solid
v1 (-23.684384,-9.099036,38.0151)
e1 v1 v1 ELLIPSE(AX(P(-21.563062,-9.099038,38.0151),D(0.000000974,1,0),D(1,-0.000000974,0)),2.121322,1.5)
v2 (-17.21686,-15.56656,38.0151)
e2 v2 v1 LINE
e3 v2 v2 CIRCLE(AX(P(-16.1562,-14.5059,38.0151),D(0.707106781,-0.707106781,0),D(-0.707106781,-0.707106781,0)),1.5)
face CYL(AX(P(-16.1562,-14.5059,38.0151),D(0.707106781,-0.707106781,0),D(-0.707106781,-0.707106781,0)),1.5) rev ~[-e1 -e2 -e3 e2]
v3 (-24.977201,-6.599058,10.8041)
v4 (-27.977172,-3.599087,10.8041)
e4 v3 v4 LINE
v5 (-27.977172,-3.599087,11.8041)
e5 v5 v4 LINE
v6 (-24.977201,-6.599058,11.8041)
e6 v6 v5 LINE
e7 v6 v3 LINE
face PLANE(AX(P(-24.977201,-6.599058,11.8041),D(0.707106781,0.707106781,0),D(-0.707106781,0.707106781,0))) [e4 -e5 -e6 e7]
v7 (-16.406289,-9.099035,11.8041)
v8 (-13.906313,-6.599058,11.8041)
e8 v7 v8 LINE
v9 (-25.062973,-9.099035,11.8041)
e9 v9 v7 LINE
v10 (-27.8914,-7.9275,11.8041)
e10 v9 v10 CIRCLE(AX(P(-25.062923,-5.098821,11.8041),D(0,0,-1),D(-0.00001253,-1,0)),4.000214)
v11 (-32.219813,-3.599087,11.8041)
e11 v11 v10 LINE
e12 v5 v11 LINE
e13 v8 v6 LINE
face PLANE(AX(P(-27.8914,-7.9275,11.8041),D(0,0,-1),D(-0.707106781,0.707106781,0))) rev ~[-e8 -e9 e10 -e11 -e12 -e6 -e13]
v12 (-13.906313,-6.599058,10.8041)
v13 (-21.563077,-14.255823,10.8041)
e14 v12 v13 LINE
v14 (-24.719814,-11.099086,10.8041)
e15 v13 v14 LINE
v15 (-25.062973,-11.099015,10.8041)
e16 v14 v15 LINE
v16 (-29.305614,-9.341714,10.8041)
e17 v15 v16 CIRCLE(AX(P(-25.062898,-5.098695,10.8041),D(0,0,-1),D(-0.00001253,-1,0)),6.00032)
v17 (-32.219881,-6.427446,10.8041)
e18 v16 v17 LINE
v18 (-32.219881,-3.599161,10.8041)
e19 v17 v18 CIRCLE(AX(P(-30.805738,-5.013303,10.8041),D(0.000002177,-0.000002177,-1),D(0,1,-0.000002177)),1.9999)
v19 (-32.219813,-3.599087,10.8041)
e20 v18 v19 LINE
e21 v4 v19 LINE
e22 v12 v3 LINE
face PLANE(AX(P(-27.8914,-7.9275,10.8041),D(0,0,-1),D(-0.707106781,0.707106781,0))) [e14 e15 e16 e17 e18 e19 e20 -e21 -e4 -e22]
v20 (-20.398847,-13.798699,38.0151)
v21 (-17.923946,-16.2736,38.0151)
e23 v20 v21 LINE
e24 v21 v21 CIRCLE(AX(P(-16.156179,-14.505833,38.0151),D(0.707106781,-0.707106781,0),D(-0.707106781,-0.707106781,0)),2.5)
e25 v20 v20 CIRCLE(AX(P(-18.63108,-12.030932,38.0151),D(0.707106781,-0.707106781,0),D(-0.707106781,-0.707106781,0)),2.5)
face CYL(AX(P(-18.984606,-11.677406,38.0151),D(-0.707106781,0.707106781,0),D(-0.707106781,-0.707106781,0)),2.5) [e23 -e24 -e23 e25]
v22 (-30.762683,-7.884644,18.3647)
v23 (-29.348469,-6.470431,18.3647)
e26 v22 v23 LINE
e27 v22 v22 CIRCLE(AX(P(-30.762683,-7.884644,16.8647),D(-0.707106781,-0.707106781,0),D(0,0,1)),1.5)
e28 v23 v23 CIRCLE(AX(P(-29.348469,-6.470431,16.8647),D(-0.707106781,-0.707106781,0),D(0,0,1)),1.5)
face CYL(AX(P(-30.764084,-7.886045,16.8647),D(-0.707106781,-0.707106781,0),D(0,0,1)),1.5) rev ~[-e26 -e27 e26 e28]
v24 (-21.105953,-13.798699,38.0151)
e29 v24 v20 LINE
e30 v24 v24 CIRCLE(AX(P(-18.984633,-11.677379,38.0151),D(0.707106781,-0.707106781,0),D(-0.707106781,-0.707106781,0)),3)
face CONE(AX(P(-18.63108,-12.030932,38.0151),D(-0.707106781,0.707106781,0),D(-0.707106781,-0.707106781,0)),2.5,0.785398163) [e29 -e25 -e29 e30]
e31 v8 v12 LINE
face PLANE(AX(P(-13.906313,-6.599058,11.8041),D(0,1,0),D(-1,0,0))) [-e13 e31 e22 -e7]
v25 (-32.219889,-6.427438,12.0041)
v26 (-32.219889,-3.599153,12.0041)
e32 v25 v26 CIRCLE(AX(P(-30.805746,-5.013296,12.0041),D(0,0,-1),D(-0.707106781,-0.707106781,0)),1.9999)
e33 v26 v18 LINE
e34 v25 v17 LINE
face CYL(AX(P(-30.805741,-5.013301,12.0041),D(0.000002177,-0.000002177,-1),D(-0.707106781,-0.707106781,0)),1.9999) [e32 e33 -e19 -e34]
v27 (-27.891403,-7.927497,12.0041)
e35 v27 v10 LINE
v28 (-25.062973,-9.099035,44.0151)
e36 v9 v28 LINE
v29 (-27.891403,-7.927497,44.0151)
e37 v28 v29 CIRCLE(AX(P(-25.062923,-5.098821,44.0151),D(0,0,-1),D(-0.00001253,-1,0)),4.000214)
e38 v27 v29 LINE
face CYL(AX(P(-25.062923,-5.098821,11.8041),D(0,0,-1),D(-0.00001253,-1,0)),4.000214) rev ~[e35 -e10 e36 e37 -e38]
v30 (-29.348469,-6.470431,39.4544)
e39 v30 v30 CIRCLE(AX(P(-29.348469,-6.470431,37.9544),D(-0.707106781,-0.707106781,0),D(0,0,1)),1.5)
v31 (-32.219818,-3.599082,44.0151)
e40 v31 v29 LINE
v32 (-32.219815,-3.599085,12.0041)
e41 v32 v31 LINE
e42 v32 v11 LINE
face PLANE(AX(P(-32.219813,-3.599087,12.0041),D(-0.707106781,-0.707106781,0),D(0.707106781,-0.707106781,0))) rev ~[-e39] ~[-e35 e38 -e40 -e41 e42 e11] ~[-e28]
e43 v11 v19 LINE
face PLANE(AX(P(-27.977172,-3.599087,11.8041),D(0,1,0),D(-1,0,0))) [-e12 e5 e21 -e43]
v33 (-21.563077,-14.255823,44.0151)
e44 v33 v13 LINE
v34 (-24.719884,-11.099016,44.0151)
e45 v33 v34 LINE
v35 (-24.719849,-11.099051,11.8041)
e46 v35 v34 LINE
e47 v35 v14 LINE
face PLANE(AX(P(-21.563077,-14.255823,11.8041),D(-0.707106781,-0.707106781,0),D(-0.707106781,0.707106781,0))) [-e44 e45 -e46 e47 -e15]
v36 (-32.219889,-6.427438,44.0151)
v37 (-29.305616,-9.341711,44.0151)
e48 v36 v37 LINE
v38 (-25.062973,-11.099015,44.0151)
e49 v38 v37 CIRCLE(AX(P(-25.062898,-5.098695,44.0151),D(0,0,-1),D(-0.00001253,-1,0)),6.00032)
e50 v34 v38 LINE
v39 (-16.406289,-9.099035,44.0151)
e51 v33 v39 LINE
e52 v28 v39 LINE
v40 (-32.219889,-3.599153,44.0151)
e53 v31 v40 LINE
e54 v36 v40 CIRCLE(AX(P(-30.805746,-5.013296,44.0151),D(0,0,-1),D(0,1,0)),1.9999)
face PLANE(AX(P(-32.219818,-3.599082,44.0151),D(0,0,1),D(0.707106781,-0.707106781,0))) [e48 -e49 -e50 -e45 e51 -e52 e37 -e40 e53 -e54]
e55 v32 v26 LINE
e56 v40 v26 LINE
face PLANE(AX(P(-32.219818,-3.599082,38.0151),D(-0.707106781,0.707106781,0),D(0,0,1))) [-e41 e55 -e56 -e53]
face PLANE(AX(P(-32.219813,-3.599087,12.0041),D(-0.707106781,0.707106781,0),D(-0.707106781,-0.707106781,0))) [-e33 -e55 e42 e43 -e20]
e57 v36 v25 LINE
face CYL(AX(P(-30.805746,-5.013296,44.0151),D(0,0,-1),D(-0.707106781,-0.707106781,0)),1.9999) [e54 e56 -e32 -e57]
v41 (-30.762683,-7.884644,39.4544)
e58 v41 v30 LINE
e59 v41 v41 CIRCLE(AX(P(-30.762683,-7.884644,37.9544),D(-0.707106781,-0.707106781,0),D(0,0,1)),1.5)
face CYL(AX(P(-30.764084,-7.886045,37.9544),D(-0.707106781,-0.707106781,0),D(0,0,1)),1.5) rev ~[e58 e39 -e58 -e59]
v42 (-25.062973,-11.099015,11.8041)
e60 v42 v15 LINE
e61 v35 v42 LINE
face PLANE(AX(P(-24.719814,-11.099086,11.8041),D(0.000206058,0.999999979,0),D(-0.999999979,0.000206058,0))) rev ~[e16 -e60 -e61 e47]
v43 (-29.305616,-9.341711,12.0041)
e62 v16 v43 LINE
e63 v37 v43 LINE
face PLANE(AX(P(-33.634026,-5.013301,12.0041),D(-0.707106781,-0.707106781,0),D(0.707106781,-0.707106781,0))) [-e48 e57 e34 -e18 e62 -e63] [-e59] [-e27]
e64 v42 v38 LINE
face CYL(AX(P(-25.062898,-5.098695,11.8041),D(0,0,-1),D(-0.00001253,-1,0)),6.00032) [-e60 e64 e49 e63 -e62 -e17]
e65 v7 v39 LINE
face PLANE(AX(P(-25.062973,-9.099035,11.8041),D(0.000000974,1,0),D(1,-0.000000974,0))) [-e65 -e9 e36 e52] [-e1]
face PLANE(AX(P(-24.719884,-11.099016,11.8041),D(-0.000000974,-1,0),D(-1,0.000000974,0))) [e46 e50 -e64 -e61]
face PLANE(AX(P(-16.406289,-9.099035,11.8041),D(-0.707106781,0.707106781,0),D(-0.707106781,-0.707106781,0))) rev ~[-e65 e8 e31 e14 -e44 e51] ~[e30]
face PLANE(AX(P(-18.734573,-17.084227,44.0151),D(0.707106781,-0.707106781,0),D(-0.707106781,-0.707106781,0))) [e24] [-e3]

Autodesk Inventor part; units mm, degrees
ref_plane "YZ Plane" through (0, 0, 0) normal (1, 0, 0) x (0, 1, 0)
ref_plane "XZ Plane" through (0, 0, 0) normal (0, 1, 0) x (-1, 0, 0)
ref_plane "XY Plane" through (0, 0, 0) normal (0, 0, 1) x (1, 0, 0)
ref_plane "Work Plane1" through (-26.7198, -9.0991, 72.4417) normal (-0.7071068, -0.7071068, 0) x (0.7071068, -0.7071068, 0)
sketch "Sketch1" plane through (-26.7198, -9.0991, 72.4417) normal (-0.7071068, -0.7071068, 0) x (0.7071068, -0.7071068, 0)
  line L0 (-1.6569, 2.5) -> (-1.6569, -60.4376) projected
  line L1 (-15.5563, 2.5) -> (-1.6569, 2.5) projected
  line L2 (-15.5563, 2.5) -> (-15.5563, 0) projected
  line L3 (-7.7782, 0) -> (-15.5563, 0) projected
  line L4 (-7.7782, -60.4376) -> (-7.7782, 0) projected
  line L5 (-7.7782, -60.4376) -> (-1.6569, -60.4376) projected
  circle A0 centre (58.298, -34.4266) radius 35
  line L6 (58.298, -34.4266) -> (-7.7782, -34.4266)
  line L7 (58.298, -34.4266) -> (124.3741, -34.4266) construction
  line L8 (-7.7782, -28.4266) -> (58.298, -28.4266)
  line L9 (58.298, -28.4266) -> (124.3741, -28.4266)
  point P0 (12.4597, -72.4417)
  point P1 (-1.6569, -28.4266)
  point P2 (-7.7782, -28.4266)
  dimension "d0" = 180
  dimension "d1" = 6
extrude "Extrusion1" add sketch "Sketch1" along normal blind 2 contours L0 L6 L4 L8 | L0 L5 L4 L6
sketch "Sketch2" plane through (-27.8914, -7.9275, 12.0041) normal (0, 0, -1) x (-0.7071068, -0.7071068, 0)
  line L0 (0, 6.1213) -> (0, 0) projected
  line L1 (0, 0) -> (2, 0) projected
  line L2 (2, 6.1213) -> (2, 0) projected
  line L3 (0, 6.1213) -> (2, 6.1213) projected
  point P0 (-25.3278, -14.1166)
extrude "Extrusion2" add sketch "Sketch2" along normal blind 0.2
sketch "Sketch3" plane through (-27.8914, -7.9275, 11.8041) normal (0, 0, -1) x (-0.7071068, 0.7071068, 0)
  arc A0 (-2.8284, 1.1716) -> (0, 0) centre (0, 4) ccw projected
  line L0 (6.1213, 0) -> (0, 0) projected
  line L1 (-2.8284, 1.1716) -> (-54.1742, 52.5173) projected
  line L2 (0, -2) -> (6.1213, -2) projected
  line L3 (0, 0) -> (0, -2) projected
  line L4 (-55.5884, 51.1031) -> (-4.2426, -0.2426)
  arc A1 (-4.2426, -0.2426) -> (0, -2) centre (0, 4) ccw
  line L5 (-9.2664, 7.2928) -> (-12.0609, 7.2928) projected
  line L6 (-9.2664, 7.2928) -> (5.6067, 7.2928) projected
  line L7 (-12.5609, 16.1266) -> (-12.5609, 10.1266) projected
  line L8 (-8.9496, 7.2928) -> (-8.9496, 0)
  line L9 (-8.9496, 7.2928) -> (-1.6569, 7.2928) construction
  line L10 (-8.9496, 0) -> (-4.4721, 0)
  line L11 (-8.9496, 0) -> (-4.4721, 0) construction
  point P0 (-14.1166, 25.3278)
  point P1 (-4.4853, 0)
  dimension "d6" = 2
  dimension "d7" = 90
  dimension "d8" = 0
extrude "Extrusion3" add sketch "Sketch3" against normal up to surface (32.211 mm away) contours A0 L3 A1 L4 L8 L1 | L4 L10 L8
sketch "Sketch4" plane through (-27.8914, -7.9275, 11.8041) normal (0, 0, -1) x (-0.7071068, 0.7071068, 0)
  line L0 (6.1213, 0) -> (0, 0) projected
  arc A0 (-2.8284, 1.1716) -> (0, 0) centre (0, 4) ccw projected
  line L1 (-2.8284, 1.1716) -> (-8.9496, 7.2928) projected
  line L2 (-8.9496, 7.2928) -> (-8.9496, 0) projected
  line L3 (-8.9496, 0) -> (-4.4853, 0) projected
  line L4 (-4.4853, 0) -> (-4.2426, -0.2426) projected
  arc A1 (-4.2426, -0.2426) -> (0, -2) centre (0, 4) ccw projected
  line L5 (0, -2) -> (6.1213, -2) projected
  line L6 (6.1213, -2) -> (6.1213, 0) projected
  line L7 (3.1213, 3) -> (6.1213, 0) projected
  line L8 (-1.1213, 3) -> (3.1213, 3) projected
  line L9 (-18.8648, 20.7435) -> (-1.1213, 3) projected
  line L10 (-8.9496, 7.2928) -> (-8.9496, 10.8283)
  point P0 (-14.1166, 25.3278)
extrude "Extrusion4" add sketch "Sketch4" along normal blind 1
fillet "Fillet1" radius 2 1 edges at (-33.634, -5.0133, 27.4096)
sketch "Sketch5" plane through (-21.563, -14.2558, 44.0151) normal (0.7071068, -0.7071068, 0) x (-0.7071068, -0.7071068, 0)
  circle A0 centre (-3.6464, 6) radius 2.5 projected
  point P0 (-25.3278, 44.0151)
extrude "Extrusion5" add sketch "Sketch5" along normal blind 4
chamfer "Chamfer1" distance 0.5 angle 45 1 edges at (-17.2169, -9.9097, 38.0151)
sketch "Sketch6" plane through (-16.1562, -14.5059, 38.0151) normal (0.7071068, -0.7071068, 0) x (-0.7071068, -0.7071068, 0)
  circle A0 centre (0, 0) radius 1.5 projected
  point P0 (-21.6814, 38.0151)
extrude "Extrusion6" cut sketch "Sketch6" against normal through all
sketch "Sketch7" plane through (-28.134, -10.5133, 72.4417) normal (-0.7071068, -0.7071068, 0) x (0, 0, 1)
  line L0 (-61.6376, 5.7782) -> (-28.4266, 5.7782) projected
  line L1 (-61.6376, 1.6569) -> (-61.6376, 5.7782) projected
  line L2 (-28.4266, 1.6569) -> (-61.6376, 1.6569) projected
  line L3 (-28.4266, 1.6569) -> (-28.4266, 5.7782) projected
  line L4 (-28.4266, 7.7782) -> (-28.4266, 5.7782) projected
  line L5 (-28.4266, 5.7782) -> (-32.4266, 5.7782)
  line L6 (-32.4266, 5.7782) -> (-32.4266, 1.6569)
  line L7 (-32.4266, 1.6569) -> (-28.4266, 1.6569)
  line L8 (-28.4266, 1.6569) -> (-28.4266, 5.7782)
  circle A0 centre (-34.4873, 3.7175) radius 2.0607
  circle A1 centre (-34.4873, 3.7175) radius 1.5
  point P0 (-72.4417, -12.4597)
  dimension "d21" = 4
  dimension "d22" = 3
extrude "Extrusion7" cut sketch "Sketch7" against normal blind 10 contours A1
sketch "Sketch8" plane through (-28.134, -10.5133, 72.4417) normal (-0.7071068, -0.7071068, 0) x (0, 0, 1)
  circle A0 centre (-34.4873, 3.7175) radius 1.5 projected
  line L0 (-61.6376, 5.7782) -> (-28.4266, 5.7782) projected
  line L1 (-61.6376, 1.6569) -> (-61.6376, 5.7782) projected
  line L2 (-28.4266, 1.6569) -> (-61.6376, 1.6569) projected
  line L3 (-28.4266, 1.6569) -> (-28.4266, 5.7782) projected
  line L4 (-61.6376, 5.7782) -> (-57.6376, 5.7782)
  line L5 (-57.6376, 5.7782) -> (-57.6376, 1.6569)
  line L6 (-57.6376, 1.6569) -> (-61.6376, 1.6569)
  line L7 (-61.6376, 1.6569) -> (-61.6376, 5.7782)
  circle A1 centre (-55.577, 3.7175) radius 2.0607
  circle A2 centre (-55.577, 3.7175) radius 1.5
  point P0 (-72.4417, -12.4597)
  dimension "d25" = 4
  dimension "d26" = 3
extrude "Extrusion8" cut sketch "Sketch8" against normal blind 10 contours A2
properties part number "GripperHandleRight_3DPrint"
